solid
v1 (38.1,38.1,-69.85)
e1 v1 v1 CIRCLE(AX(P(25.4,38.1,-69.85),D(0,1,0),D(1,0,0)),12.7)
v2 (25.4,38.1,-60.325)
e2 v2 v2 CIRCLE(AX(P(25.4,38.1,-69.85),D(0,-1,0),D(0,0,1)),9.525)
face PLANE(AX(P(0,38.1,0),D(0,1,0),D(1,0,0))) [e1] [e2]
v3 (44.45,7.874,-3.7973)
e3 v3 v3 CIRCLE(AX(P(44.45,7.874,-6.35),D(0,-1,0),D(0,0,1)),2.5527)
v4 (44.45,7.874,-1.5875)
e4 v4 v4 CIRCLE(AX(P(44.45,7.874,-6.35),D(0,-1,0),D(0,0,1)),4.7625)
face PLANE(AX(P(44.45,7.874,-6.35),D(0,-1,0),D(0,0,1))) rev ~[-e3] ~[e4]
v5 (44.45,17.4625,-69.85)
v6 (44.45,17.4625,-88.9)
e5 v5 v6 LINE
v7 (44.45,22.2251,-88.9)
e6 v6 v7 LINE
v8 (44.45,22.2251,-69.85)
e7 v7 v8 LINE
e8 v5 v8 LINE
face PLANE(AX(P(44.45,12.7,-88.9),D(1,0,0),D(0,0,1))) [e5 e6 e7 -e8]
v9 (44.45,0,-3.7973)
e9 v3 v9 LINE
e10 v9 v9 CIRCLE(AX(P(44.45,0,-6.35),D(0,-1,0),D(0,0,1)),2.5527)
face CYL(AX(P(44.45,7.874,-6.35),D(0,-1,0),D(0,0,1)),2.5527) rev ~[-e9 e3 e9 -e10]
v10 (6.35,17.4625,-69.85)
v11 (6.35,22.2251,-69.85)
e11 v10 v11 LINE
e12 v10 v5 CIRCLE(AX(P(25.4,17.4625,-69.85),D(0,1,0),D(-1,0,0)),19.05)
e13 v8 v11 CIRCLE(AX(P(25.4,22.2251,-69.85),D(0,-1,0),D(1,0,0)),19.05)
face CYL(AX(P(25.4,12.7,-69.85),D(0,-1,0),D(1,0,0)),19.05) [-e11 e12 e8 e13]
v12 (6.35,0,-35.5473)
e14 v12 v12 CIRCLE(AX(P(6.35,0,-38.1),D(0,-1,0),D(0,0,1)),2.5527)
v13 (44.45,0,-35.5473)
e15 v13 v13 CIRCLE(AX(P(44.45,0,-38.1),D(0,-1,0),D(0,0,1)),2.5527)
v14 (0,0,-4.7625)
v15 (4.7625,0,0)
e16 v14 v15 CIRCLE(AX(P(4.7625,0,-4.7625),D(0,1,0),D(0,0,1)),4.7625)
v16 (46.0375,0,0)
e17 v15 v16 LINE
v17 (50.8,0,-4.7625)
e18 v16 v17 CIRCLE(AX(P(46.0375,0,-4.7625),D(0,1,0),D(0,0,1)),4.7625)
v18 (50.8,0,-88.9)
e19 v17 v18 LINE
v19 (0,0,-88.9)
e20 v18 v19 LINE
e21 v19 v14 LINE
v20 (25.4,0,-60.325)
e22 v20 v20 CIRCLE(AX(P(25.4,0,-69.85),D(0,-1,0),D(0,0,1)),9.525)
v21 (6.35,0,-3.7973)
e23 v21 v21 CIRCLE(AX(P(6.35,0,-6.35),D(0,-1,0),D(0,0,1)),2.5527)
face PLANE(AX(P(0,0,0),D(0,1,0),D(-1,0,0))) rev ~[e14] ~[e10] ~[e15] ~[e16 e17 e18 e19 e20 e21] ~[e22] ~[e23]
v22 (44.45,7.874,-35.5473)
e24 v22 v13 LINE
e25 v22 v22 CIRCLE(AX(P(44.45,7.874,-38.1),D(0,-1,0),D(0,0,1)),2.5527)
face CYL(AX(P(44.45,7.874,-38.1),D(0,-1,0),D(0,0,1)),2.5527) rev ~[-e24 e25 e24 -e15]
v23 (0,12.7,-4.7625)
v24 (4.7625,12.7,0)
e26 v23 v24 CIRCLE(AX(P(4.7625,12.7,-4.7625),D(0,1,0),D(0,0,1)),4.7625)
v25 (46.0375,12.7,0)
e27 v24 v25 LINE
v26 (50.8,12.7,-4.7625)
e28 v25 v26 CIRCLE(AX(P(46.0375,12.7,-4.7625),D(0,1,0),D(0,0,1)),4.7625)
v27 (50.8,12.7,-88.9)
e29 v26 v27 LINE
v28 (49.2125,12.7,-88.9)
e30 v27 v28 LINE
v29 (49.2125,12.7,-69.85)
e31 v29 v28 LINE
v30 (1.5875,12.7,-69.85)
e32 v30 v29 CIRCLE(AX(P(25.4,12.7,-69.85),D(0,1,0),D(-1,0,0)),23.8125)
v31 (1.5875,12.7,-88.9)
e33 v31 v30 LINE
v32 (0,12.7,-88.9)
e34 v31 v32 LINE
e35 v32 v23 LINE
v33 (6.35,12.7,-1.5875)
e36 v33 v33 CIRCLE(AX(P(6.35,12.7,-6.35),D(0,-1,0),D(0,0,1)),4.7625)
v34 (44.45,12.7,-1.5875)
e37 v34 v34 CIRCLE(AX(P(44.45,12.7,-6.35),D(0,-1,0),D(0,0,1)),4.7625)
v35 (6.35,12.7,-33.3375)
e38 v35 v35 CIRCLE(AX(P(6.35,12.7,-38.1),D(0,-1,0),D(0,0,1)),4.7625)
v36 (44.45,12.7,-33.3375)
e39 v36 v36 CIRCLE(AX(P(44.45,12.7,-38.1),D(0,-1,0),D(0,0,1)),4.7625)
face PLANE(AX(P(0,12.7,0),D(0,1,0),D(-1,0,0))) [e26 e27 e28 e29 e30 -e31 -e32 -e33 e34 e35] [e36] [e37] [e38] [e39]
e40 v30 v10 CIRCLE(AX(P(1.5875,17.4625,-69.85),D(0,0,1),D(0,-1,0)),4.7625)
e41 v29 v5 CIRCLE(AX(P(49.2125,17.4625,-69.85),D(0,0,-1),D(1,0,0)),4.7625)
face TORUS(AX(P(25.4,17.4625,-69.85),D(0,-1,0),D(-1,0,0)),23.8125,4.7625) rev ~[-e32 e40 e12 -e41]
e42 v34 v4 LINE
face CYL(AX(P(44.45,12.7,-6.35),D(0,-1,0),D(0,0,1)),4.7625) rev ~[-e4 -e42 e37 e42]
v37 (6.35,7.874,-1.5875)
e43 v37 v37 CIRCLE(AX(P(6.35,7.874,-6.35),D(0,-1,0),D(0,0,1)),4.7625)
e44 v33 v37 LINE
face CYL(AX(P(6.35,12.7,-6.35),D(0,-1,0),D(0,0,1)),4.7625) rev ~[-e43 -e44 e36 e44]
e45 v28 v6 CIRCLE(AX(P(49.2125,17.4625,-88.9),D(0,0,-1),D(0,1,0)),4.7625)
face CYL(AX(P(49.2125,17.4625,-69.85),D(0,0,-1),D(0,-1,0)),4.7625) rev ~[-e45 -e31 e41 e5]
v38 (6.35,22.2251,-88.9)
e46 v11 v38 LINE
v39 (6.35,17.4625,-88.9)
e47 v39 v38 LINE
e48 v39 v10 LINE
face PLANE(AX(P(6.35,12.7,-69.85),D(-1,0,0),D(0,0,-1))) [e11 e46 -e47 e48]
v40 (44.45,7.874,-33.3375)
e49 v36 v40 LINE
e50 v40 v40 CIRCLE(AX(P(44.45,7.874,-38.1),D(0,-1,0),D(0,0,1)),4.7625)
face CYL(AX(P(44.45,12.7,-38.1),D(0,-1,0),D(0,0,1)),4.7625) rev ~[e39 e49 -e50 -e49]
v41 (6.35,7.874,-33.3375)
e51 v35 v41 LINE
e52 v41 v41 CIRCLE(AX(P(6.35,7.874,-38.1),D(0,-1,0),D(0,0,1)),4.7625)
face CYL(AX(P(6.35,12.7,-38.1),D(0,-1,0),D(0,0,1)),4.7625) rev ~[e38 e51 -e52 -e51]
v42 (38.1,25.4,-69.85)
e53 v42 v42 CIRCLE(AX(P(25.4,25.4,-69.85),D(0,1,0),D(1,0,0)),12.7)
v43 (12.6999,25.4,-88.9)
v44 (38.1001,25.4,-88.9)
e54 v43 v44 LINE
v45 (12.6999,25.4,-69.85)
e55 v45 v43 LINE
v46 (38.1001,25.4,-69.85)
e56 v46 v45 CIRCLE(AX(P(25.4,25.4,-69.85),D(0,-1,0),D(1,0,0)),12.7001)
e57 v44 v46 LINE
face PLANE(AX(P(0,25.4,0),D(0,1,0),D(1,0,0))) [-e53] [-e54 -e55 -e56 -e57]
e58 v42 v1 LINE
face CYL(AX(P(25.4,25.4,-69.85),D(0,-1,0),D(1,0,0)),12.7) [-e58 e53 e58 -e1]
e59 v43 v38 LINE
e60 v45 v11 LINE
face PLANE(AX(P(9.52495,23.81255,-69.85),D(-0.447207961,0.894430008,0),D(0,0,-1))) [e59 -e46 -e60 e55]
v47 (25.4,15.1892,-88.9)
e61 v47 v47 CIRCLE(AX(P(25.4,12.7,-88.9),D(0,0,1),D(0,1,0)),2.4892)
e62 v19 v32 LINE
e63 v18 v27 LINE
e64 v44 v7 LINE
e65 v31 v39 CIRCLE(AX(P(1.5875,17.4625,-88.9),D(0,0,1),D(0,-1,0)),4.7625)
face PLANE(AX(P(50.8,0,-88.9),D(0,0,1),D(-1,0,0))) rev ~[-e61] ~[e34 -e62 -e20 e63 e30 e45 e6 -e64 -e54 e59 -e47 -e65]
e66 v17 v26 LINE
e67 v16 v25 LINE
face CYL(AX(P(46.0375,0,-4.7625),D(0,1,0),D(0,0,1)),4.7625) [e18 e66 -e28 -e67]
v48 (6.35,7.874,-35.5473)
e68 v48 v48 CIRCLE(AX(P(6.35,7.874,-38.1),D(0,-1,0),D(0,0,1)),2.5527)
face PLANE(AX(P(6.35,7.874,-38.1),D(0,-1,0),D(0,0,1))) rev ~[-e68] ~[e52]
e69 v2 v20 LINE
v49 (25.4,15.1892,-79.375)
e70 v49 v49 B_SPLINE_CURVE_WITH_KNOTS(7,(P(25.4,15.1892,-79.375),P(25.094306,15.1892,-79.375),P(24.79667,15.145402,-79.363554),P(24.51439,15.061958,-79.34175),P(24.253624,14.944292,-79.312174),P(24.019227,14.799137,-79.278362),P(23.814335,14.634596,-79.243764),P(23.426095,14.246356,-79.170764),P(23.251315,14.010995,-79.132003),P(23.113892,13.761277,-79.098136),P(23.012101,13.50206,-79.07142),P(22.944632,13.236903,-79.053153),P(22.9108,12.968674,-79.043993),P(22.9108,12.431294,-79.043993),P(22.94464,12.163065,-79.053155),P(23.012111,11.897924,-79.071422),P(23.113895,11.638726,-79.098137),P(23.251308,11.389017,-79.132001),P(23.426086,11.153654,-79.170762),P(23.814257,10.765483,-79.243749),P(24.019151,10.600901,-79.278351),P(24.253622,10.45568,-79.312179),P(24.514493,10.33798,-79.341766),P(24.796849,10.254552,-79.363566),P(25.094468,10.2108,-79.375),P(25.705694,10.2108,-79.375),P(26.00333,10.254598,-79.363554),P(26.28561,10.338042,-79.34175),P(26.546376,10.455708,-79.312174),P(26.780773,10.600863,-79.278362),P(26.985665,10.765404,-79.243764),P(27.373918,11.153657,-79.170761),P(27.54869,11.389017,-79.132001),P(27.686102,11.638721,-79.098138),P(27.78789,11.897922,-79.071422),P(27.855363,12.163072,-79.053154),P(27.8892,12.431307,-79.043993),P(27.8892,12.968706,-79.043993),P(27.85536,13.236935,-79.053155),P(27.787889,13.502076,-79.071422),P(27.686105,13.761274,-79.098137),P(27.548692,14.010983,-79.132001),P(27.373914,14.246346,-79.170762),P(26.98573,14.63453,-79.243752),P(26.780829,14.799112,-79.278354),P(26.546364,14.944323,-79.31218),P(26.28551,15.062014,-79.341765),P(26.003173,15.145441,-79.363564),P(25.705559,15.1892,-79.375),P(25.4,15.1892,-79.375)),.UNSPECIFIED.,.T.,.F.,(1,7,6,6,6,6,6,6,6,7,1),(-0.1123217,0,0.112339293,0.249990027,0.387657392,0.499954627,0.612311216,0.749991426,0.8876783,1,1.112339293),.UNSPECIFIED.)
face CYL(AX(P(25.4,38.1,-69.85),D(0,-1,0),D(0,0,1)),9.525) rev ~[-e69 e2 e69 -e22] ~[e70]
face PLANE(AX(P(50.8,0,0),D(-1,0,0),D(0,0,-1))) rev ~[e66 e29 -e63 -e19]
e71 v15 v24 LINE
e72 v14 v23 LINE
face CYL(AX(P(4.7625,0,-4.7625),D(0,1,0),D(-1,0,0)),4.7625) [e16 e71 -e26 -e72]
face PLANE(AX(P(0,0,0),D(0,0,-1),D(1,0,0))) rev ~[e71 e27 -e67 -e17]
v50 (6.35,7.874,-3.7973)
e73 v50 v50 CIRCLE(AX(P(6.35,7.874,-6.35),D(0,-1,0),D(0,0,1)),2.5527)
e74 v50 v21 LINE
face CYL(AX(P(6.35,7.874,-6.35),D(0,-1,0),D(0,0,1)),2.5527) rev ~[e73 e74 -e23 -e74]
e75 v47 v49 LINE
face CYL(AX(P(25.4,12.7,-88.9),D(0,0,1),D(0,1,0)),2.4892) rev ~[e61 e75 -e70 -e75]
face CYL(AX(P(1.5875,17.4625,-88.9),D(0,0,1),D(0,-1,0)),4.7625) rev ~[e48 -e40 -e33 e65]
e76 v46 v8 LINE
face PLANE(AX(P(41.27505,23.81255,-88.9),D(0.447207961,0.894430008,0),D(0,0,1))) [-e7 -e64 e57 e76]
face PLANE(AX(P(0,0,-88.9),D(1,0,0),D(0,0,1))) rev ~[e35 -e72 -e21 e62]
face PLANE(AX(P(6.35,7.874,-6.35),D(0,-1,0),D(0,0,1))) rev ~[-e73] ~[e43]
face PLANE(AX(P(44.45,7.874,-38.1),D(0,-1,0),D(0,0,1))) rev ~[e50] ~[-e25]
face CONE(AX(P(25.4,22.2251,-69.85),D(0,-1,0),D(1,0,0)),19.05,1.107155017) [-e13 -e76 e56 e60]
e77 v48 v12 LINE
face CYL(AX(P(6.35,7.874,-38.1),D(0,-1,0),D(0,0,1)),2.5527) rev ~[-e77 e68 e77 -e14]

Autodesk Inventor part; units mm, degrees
ref_plane "YZ Plane" through (0, 0, 0) normal (1, 0, 0) x (0, 1, 0)
ref_plane "XZ Plane" through (0, 0, 0) normal (0, 1, 0) x (-1, 0, 0)
ref_plane "XY Plane" through (0, 0, 0) normal (0, 0, 1) x (1, 0, 0)
sketch "Sketch1" plane through (0, 0, 0) normal (0, 1, 0) x (-1, 0, 0)
  line L0 (0, 0) -> (-50.8, 0)
  line L1 (-50.8, 0) -> (-50.8, -88.9)
  line L2 (-50.8, -88.9) -> (0, -88.9)
  line L3 (0, -88.9) -> (0, 0)
  dimension "d0" = 50.8
  dimension "d1" = 88.9
extrude "Extrusion1" add sketch "Sketch1" along normal blind 12.7
sketch "Sketch2" plane through (0, 12.7, 0) normal (0, 1, 0) x (1, 0, 0)
  line L0 (50.8, 0) -> (50.8, 88.9) projected
  line L1 (50.8, 88.9) -> (0, 88.9) projected
  line L2 (0, 88.9) -> (0, 0) projected
  line L3 (6.35, 88.9) -> (44.45, 88.9)
  line L4 (44.45, 88.9) -> (44.45, 69.85)
  line L5 (44.45, 69.85) -> (6.35, 69.85)
  line L6 (6.35, 69.85) -> (6.35, 88.9)
  line L7 (6.35, 79.375) -> (0, 79.375) construction
  line L8 (44.45, 79.375) -> (50.8, 79.375) construction
  circle A0 centre (25.4, 69.85) radius 19.05
  dimension "d4" = 19.05
  dimension "d5" = 6.35
extrude "Extrusion2" add sketch "Sketch2" along normal blind 12.7
sketch "Sketch3" plane through (0, 25.4, 0) normal (0, 1, 0) x (1, 0, 0)
  arc A0 (6.35, 69.85) -> (44.45, 69.85) centre (25.4, 69.85) ccw projected
  circle A1 centre (25.4, 69.85) radius 12.7
  point P0 (0, 0)
  dimension "d8" = 25.4
extrude "Extrusion3" add sketch "Sketch3" along normal blind 12.7
sketch "Sketch6" plane through (0, 12.7, 0) normal (0, 1, 0) x (1, 0, 0)
  line L0 (0, 88.9) -> (0, 0) projected
  line L1 (0, 0) -> (50.8, 0) projected
  line L2 (50.8, 0) -> (50.8, 88.9) projected
  line L3 (44.45, 88.9) -> (44.45, 6.35) construction
  line L4 (44.45, 6.35) -> (6.35, 6.35) construction
  line L5 (6.35, 6.35) -> (6.35, 88.9) construction
  line L6 (6.35, 38.1) -> (44.45, 38.1) construction
  dimension "d35" = 6.35
  dimension "d36" = 31.75
hole "Hole3" at (25.4, 38.1, -69.85) direction (0, -1, 0) diameter 19.05 end through all
sketch "Sketch7" plane through (50.8, 0, -88.9) normal (0, 0, -1) x (-1, 0, 0)
  line L0 (0, 0) -> (0, 12.7) projected
  line L1 (44.45, 12.7) -> (6.35, 12.7) construction
  point P0 (25.4, 12.7)
hole "Hole4" at (25.4, 12.7, -88.9) direction (0, 0, 1) diameter 4.9784 end up to surface thread size "1/4-20 UNC" class "2B" standard "ANSI Unified Screw Threads"
hole "Hole5" at (6.35, 12.7, -6.35) at (6.35, 12.7, -38.1) at (44.45, 12.7, -6.35) at (44.45, 12.7, -38.1) direction (0, -1, 0) diameter 5.1054 end through all counterbore diameter 9.525 counterbore depth 4.826 clearance for "Socket Head Cap Screw" size "#10" standard "Ansi Unified Screw Threads"
fillet "Fillet1" radius 4.7625 5 edges at (25.4, 12.7, -50.8) (6.35, 12.7, -79.375) (44.45, 12.7, -79.375) (0, 6.35, 0) (50.8, 6.35, 0)
chamfer "Chamfer1" distance 6.35 distance2 3.175 3 edges at (44.45, 25.4, -79.375) (25.4, 25.4, -50.8) (6.35, 25.4, -79.375) measured on face at (24.8897, 25.4, -86.7525)
properties part number "Fillet Chamfer Complete"
